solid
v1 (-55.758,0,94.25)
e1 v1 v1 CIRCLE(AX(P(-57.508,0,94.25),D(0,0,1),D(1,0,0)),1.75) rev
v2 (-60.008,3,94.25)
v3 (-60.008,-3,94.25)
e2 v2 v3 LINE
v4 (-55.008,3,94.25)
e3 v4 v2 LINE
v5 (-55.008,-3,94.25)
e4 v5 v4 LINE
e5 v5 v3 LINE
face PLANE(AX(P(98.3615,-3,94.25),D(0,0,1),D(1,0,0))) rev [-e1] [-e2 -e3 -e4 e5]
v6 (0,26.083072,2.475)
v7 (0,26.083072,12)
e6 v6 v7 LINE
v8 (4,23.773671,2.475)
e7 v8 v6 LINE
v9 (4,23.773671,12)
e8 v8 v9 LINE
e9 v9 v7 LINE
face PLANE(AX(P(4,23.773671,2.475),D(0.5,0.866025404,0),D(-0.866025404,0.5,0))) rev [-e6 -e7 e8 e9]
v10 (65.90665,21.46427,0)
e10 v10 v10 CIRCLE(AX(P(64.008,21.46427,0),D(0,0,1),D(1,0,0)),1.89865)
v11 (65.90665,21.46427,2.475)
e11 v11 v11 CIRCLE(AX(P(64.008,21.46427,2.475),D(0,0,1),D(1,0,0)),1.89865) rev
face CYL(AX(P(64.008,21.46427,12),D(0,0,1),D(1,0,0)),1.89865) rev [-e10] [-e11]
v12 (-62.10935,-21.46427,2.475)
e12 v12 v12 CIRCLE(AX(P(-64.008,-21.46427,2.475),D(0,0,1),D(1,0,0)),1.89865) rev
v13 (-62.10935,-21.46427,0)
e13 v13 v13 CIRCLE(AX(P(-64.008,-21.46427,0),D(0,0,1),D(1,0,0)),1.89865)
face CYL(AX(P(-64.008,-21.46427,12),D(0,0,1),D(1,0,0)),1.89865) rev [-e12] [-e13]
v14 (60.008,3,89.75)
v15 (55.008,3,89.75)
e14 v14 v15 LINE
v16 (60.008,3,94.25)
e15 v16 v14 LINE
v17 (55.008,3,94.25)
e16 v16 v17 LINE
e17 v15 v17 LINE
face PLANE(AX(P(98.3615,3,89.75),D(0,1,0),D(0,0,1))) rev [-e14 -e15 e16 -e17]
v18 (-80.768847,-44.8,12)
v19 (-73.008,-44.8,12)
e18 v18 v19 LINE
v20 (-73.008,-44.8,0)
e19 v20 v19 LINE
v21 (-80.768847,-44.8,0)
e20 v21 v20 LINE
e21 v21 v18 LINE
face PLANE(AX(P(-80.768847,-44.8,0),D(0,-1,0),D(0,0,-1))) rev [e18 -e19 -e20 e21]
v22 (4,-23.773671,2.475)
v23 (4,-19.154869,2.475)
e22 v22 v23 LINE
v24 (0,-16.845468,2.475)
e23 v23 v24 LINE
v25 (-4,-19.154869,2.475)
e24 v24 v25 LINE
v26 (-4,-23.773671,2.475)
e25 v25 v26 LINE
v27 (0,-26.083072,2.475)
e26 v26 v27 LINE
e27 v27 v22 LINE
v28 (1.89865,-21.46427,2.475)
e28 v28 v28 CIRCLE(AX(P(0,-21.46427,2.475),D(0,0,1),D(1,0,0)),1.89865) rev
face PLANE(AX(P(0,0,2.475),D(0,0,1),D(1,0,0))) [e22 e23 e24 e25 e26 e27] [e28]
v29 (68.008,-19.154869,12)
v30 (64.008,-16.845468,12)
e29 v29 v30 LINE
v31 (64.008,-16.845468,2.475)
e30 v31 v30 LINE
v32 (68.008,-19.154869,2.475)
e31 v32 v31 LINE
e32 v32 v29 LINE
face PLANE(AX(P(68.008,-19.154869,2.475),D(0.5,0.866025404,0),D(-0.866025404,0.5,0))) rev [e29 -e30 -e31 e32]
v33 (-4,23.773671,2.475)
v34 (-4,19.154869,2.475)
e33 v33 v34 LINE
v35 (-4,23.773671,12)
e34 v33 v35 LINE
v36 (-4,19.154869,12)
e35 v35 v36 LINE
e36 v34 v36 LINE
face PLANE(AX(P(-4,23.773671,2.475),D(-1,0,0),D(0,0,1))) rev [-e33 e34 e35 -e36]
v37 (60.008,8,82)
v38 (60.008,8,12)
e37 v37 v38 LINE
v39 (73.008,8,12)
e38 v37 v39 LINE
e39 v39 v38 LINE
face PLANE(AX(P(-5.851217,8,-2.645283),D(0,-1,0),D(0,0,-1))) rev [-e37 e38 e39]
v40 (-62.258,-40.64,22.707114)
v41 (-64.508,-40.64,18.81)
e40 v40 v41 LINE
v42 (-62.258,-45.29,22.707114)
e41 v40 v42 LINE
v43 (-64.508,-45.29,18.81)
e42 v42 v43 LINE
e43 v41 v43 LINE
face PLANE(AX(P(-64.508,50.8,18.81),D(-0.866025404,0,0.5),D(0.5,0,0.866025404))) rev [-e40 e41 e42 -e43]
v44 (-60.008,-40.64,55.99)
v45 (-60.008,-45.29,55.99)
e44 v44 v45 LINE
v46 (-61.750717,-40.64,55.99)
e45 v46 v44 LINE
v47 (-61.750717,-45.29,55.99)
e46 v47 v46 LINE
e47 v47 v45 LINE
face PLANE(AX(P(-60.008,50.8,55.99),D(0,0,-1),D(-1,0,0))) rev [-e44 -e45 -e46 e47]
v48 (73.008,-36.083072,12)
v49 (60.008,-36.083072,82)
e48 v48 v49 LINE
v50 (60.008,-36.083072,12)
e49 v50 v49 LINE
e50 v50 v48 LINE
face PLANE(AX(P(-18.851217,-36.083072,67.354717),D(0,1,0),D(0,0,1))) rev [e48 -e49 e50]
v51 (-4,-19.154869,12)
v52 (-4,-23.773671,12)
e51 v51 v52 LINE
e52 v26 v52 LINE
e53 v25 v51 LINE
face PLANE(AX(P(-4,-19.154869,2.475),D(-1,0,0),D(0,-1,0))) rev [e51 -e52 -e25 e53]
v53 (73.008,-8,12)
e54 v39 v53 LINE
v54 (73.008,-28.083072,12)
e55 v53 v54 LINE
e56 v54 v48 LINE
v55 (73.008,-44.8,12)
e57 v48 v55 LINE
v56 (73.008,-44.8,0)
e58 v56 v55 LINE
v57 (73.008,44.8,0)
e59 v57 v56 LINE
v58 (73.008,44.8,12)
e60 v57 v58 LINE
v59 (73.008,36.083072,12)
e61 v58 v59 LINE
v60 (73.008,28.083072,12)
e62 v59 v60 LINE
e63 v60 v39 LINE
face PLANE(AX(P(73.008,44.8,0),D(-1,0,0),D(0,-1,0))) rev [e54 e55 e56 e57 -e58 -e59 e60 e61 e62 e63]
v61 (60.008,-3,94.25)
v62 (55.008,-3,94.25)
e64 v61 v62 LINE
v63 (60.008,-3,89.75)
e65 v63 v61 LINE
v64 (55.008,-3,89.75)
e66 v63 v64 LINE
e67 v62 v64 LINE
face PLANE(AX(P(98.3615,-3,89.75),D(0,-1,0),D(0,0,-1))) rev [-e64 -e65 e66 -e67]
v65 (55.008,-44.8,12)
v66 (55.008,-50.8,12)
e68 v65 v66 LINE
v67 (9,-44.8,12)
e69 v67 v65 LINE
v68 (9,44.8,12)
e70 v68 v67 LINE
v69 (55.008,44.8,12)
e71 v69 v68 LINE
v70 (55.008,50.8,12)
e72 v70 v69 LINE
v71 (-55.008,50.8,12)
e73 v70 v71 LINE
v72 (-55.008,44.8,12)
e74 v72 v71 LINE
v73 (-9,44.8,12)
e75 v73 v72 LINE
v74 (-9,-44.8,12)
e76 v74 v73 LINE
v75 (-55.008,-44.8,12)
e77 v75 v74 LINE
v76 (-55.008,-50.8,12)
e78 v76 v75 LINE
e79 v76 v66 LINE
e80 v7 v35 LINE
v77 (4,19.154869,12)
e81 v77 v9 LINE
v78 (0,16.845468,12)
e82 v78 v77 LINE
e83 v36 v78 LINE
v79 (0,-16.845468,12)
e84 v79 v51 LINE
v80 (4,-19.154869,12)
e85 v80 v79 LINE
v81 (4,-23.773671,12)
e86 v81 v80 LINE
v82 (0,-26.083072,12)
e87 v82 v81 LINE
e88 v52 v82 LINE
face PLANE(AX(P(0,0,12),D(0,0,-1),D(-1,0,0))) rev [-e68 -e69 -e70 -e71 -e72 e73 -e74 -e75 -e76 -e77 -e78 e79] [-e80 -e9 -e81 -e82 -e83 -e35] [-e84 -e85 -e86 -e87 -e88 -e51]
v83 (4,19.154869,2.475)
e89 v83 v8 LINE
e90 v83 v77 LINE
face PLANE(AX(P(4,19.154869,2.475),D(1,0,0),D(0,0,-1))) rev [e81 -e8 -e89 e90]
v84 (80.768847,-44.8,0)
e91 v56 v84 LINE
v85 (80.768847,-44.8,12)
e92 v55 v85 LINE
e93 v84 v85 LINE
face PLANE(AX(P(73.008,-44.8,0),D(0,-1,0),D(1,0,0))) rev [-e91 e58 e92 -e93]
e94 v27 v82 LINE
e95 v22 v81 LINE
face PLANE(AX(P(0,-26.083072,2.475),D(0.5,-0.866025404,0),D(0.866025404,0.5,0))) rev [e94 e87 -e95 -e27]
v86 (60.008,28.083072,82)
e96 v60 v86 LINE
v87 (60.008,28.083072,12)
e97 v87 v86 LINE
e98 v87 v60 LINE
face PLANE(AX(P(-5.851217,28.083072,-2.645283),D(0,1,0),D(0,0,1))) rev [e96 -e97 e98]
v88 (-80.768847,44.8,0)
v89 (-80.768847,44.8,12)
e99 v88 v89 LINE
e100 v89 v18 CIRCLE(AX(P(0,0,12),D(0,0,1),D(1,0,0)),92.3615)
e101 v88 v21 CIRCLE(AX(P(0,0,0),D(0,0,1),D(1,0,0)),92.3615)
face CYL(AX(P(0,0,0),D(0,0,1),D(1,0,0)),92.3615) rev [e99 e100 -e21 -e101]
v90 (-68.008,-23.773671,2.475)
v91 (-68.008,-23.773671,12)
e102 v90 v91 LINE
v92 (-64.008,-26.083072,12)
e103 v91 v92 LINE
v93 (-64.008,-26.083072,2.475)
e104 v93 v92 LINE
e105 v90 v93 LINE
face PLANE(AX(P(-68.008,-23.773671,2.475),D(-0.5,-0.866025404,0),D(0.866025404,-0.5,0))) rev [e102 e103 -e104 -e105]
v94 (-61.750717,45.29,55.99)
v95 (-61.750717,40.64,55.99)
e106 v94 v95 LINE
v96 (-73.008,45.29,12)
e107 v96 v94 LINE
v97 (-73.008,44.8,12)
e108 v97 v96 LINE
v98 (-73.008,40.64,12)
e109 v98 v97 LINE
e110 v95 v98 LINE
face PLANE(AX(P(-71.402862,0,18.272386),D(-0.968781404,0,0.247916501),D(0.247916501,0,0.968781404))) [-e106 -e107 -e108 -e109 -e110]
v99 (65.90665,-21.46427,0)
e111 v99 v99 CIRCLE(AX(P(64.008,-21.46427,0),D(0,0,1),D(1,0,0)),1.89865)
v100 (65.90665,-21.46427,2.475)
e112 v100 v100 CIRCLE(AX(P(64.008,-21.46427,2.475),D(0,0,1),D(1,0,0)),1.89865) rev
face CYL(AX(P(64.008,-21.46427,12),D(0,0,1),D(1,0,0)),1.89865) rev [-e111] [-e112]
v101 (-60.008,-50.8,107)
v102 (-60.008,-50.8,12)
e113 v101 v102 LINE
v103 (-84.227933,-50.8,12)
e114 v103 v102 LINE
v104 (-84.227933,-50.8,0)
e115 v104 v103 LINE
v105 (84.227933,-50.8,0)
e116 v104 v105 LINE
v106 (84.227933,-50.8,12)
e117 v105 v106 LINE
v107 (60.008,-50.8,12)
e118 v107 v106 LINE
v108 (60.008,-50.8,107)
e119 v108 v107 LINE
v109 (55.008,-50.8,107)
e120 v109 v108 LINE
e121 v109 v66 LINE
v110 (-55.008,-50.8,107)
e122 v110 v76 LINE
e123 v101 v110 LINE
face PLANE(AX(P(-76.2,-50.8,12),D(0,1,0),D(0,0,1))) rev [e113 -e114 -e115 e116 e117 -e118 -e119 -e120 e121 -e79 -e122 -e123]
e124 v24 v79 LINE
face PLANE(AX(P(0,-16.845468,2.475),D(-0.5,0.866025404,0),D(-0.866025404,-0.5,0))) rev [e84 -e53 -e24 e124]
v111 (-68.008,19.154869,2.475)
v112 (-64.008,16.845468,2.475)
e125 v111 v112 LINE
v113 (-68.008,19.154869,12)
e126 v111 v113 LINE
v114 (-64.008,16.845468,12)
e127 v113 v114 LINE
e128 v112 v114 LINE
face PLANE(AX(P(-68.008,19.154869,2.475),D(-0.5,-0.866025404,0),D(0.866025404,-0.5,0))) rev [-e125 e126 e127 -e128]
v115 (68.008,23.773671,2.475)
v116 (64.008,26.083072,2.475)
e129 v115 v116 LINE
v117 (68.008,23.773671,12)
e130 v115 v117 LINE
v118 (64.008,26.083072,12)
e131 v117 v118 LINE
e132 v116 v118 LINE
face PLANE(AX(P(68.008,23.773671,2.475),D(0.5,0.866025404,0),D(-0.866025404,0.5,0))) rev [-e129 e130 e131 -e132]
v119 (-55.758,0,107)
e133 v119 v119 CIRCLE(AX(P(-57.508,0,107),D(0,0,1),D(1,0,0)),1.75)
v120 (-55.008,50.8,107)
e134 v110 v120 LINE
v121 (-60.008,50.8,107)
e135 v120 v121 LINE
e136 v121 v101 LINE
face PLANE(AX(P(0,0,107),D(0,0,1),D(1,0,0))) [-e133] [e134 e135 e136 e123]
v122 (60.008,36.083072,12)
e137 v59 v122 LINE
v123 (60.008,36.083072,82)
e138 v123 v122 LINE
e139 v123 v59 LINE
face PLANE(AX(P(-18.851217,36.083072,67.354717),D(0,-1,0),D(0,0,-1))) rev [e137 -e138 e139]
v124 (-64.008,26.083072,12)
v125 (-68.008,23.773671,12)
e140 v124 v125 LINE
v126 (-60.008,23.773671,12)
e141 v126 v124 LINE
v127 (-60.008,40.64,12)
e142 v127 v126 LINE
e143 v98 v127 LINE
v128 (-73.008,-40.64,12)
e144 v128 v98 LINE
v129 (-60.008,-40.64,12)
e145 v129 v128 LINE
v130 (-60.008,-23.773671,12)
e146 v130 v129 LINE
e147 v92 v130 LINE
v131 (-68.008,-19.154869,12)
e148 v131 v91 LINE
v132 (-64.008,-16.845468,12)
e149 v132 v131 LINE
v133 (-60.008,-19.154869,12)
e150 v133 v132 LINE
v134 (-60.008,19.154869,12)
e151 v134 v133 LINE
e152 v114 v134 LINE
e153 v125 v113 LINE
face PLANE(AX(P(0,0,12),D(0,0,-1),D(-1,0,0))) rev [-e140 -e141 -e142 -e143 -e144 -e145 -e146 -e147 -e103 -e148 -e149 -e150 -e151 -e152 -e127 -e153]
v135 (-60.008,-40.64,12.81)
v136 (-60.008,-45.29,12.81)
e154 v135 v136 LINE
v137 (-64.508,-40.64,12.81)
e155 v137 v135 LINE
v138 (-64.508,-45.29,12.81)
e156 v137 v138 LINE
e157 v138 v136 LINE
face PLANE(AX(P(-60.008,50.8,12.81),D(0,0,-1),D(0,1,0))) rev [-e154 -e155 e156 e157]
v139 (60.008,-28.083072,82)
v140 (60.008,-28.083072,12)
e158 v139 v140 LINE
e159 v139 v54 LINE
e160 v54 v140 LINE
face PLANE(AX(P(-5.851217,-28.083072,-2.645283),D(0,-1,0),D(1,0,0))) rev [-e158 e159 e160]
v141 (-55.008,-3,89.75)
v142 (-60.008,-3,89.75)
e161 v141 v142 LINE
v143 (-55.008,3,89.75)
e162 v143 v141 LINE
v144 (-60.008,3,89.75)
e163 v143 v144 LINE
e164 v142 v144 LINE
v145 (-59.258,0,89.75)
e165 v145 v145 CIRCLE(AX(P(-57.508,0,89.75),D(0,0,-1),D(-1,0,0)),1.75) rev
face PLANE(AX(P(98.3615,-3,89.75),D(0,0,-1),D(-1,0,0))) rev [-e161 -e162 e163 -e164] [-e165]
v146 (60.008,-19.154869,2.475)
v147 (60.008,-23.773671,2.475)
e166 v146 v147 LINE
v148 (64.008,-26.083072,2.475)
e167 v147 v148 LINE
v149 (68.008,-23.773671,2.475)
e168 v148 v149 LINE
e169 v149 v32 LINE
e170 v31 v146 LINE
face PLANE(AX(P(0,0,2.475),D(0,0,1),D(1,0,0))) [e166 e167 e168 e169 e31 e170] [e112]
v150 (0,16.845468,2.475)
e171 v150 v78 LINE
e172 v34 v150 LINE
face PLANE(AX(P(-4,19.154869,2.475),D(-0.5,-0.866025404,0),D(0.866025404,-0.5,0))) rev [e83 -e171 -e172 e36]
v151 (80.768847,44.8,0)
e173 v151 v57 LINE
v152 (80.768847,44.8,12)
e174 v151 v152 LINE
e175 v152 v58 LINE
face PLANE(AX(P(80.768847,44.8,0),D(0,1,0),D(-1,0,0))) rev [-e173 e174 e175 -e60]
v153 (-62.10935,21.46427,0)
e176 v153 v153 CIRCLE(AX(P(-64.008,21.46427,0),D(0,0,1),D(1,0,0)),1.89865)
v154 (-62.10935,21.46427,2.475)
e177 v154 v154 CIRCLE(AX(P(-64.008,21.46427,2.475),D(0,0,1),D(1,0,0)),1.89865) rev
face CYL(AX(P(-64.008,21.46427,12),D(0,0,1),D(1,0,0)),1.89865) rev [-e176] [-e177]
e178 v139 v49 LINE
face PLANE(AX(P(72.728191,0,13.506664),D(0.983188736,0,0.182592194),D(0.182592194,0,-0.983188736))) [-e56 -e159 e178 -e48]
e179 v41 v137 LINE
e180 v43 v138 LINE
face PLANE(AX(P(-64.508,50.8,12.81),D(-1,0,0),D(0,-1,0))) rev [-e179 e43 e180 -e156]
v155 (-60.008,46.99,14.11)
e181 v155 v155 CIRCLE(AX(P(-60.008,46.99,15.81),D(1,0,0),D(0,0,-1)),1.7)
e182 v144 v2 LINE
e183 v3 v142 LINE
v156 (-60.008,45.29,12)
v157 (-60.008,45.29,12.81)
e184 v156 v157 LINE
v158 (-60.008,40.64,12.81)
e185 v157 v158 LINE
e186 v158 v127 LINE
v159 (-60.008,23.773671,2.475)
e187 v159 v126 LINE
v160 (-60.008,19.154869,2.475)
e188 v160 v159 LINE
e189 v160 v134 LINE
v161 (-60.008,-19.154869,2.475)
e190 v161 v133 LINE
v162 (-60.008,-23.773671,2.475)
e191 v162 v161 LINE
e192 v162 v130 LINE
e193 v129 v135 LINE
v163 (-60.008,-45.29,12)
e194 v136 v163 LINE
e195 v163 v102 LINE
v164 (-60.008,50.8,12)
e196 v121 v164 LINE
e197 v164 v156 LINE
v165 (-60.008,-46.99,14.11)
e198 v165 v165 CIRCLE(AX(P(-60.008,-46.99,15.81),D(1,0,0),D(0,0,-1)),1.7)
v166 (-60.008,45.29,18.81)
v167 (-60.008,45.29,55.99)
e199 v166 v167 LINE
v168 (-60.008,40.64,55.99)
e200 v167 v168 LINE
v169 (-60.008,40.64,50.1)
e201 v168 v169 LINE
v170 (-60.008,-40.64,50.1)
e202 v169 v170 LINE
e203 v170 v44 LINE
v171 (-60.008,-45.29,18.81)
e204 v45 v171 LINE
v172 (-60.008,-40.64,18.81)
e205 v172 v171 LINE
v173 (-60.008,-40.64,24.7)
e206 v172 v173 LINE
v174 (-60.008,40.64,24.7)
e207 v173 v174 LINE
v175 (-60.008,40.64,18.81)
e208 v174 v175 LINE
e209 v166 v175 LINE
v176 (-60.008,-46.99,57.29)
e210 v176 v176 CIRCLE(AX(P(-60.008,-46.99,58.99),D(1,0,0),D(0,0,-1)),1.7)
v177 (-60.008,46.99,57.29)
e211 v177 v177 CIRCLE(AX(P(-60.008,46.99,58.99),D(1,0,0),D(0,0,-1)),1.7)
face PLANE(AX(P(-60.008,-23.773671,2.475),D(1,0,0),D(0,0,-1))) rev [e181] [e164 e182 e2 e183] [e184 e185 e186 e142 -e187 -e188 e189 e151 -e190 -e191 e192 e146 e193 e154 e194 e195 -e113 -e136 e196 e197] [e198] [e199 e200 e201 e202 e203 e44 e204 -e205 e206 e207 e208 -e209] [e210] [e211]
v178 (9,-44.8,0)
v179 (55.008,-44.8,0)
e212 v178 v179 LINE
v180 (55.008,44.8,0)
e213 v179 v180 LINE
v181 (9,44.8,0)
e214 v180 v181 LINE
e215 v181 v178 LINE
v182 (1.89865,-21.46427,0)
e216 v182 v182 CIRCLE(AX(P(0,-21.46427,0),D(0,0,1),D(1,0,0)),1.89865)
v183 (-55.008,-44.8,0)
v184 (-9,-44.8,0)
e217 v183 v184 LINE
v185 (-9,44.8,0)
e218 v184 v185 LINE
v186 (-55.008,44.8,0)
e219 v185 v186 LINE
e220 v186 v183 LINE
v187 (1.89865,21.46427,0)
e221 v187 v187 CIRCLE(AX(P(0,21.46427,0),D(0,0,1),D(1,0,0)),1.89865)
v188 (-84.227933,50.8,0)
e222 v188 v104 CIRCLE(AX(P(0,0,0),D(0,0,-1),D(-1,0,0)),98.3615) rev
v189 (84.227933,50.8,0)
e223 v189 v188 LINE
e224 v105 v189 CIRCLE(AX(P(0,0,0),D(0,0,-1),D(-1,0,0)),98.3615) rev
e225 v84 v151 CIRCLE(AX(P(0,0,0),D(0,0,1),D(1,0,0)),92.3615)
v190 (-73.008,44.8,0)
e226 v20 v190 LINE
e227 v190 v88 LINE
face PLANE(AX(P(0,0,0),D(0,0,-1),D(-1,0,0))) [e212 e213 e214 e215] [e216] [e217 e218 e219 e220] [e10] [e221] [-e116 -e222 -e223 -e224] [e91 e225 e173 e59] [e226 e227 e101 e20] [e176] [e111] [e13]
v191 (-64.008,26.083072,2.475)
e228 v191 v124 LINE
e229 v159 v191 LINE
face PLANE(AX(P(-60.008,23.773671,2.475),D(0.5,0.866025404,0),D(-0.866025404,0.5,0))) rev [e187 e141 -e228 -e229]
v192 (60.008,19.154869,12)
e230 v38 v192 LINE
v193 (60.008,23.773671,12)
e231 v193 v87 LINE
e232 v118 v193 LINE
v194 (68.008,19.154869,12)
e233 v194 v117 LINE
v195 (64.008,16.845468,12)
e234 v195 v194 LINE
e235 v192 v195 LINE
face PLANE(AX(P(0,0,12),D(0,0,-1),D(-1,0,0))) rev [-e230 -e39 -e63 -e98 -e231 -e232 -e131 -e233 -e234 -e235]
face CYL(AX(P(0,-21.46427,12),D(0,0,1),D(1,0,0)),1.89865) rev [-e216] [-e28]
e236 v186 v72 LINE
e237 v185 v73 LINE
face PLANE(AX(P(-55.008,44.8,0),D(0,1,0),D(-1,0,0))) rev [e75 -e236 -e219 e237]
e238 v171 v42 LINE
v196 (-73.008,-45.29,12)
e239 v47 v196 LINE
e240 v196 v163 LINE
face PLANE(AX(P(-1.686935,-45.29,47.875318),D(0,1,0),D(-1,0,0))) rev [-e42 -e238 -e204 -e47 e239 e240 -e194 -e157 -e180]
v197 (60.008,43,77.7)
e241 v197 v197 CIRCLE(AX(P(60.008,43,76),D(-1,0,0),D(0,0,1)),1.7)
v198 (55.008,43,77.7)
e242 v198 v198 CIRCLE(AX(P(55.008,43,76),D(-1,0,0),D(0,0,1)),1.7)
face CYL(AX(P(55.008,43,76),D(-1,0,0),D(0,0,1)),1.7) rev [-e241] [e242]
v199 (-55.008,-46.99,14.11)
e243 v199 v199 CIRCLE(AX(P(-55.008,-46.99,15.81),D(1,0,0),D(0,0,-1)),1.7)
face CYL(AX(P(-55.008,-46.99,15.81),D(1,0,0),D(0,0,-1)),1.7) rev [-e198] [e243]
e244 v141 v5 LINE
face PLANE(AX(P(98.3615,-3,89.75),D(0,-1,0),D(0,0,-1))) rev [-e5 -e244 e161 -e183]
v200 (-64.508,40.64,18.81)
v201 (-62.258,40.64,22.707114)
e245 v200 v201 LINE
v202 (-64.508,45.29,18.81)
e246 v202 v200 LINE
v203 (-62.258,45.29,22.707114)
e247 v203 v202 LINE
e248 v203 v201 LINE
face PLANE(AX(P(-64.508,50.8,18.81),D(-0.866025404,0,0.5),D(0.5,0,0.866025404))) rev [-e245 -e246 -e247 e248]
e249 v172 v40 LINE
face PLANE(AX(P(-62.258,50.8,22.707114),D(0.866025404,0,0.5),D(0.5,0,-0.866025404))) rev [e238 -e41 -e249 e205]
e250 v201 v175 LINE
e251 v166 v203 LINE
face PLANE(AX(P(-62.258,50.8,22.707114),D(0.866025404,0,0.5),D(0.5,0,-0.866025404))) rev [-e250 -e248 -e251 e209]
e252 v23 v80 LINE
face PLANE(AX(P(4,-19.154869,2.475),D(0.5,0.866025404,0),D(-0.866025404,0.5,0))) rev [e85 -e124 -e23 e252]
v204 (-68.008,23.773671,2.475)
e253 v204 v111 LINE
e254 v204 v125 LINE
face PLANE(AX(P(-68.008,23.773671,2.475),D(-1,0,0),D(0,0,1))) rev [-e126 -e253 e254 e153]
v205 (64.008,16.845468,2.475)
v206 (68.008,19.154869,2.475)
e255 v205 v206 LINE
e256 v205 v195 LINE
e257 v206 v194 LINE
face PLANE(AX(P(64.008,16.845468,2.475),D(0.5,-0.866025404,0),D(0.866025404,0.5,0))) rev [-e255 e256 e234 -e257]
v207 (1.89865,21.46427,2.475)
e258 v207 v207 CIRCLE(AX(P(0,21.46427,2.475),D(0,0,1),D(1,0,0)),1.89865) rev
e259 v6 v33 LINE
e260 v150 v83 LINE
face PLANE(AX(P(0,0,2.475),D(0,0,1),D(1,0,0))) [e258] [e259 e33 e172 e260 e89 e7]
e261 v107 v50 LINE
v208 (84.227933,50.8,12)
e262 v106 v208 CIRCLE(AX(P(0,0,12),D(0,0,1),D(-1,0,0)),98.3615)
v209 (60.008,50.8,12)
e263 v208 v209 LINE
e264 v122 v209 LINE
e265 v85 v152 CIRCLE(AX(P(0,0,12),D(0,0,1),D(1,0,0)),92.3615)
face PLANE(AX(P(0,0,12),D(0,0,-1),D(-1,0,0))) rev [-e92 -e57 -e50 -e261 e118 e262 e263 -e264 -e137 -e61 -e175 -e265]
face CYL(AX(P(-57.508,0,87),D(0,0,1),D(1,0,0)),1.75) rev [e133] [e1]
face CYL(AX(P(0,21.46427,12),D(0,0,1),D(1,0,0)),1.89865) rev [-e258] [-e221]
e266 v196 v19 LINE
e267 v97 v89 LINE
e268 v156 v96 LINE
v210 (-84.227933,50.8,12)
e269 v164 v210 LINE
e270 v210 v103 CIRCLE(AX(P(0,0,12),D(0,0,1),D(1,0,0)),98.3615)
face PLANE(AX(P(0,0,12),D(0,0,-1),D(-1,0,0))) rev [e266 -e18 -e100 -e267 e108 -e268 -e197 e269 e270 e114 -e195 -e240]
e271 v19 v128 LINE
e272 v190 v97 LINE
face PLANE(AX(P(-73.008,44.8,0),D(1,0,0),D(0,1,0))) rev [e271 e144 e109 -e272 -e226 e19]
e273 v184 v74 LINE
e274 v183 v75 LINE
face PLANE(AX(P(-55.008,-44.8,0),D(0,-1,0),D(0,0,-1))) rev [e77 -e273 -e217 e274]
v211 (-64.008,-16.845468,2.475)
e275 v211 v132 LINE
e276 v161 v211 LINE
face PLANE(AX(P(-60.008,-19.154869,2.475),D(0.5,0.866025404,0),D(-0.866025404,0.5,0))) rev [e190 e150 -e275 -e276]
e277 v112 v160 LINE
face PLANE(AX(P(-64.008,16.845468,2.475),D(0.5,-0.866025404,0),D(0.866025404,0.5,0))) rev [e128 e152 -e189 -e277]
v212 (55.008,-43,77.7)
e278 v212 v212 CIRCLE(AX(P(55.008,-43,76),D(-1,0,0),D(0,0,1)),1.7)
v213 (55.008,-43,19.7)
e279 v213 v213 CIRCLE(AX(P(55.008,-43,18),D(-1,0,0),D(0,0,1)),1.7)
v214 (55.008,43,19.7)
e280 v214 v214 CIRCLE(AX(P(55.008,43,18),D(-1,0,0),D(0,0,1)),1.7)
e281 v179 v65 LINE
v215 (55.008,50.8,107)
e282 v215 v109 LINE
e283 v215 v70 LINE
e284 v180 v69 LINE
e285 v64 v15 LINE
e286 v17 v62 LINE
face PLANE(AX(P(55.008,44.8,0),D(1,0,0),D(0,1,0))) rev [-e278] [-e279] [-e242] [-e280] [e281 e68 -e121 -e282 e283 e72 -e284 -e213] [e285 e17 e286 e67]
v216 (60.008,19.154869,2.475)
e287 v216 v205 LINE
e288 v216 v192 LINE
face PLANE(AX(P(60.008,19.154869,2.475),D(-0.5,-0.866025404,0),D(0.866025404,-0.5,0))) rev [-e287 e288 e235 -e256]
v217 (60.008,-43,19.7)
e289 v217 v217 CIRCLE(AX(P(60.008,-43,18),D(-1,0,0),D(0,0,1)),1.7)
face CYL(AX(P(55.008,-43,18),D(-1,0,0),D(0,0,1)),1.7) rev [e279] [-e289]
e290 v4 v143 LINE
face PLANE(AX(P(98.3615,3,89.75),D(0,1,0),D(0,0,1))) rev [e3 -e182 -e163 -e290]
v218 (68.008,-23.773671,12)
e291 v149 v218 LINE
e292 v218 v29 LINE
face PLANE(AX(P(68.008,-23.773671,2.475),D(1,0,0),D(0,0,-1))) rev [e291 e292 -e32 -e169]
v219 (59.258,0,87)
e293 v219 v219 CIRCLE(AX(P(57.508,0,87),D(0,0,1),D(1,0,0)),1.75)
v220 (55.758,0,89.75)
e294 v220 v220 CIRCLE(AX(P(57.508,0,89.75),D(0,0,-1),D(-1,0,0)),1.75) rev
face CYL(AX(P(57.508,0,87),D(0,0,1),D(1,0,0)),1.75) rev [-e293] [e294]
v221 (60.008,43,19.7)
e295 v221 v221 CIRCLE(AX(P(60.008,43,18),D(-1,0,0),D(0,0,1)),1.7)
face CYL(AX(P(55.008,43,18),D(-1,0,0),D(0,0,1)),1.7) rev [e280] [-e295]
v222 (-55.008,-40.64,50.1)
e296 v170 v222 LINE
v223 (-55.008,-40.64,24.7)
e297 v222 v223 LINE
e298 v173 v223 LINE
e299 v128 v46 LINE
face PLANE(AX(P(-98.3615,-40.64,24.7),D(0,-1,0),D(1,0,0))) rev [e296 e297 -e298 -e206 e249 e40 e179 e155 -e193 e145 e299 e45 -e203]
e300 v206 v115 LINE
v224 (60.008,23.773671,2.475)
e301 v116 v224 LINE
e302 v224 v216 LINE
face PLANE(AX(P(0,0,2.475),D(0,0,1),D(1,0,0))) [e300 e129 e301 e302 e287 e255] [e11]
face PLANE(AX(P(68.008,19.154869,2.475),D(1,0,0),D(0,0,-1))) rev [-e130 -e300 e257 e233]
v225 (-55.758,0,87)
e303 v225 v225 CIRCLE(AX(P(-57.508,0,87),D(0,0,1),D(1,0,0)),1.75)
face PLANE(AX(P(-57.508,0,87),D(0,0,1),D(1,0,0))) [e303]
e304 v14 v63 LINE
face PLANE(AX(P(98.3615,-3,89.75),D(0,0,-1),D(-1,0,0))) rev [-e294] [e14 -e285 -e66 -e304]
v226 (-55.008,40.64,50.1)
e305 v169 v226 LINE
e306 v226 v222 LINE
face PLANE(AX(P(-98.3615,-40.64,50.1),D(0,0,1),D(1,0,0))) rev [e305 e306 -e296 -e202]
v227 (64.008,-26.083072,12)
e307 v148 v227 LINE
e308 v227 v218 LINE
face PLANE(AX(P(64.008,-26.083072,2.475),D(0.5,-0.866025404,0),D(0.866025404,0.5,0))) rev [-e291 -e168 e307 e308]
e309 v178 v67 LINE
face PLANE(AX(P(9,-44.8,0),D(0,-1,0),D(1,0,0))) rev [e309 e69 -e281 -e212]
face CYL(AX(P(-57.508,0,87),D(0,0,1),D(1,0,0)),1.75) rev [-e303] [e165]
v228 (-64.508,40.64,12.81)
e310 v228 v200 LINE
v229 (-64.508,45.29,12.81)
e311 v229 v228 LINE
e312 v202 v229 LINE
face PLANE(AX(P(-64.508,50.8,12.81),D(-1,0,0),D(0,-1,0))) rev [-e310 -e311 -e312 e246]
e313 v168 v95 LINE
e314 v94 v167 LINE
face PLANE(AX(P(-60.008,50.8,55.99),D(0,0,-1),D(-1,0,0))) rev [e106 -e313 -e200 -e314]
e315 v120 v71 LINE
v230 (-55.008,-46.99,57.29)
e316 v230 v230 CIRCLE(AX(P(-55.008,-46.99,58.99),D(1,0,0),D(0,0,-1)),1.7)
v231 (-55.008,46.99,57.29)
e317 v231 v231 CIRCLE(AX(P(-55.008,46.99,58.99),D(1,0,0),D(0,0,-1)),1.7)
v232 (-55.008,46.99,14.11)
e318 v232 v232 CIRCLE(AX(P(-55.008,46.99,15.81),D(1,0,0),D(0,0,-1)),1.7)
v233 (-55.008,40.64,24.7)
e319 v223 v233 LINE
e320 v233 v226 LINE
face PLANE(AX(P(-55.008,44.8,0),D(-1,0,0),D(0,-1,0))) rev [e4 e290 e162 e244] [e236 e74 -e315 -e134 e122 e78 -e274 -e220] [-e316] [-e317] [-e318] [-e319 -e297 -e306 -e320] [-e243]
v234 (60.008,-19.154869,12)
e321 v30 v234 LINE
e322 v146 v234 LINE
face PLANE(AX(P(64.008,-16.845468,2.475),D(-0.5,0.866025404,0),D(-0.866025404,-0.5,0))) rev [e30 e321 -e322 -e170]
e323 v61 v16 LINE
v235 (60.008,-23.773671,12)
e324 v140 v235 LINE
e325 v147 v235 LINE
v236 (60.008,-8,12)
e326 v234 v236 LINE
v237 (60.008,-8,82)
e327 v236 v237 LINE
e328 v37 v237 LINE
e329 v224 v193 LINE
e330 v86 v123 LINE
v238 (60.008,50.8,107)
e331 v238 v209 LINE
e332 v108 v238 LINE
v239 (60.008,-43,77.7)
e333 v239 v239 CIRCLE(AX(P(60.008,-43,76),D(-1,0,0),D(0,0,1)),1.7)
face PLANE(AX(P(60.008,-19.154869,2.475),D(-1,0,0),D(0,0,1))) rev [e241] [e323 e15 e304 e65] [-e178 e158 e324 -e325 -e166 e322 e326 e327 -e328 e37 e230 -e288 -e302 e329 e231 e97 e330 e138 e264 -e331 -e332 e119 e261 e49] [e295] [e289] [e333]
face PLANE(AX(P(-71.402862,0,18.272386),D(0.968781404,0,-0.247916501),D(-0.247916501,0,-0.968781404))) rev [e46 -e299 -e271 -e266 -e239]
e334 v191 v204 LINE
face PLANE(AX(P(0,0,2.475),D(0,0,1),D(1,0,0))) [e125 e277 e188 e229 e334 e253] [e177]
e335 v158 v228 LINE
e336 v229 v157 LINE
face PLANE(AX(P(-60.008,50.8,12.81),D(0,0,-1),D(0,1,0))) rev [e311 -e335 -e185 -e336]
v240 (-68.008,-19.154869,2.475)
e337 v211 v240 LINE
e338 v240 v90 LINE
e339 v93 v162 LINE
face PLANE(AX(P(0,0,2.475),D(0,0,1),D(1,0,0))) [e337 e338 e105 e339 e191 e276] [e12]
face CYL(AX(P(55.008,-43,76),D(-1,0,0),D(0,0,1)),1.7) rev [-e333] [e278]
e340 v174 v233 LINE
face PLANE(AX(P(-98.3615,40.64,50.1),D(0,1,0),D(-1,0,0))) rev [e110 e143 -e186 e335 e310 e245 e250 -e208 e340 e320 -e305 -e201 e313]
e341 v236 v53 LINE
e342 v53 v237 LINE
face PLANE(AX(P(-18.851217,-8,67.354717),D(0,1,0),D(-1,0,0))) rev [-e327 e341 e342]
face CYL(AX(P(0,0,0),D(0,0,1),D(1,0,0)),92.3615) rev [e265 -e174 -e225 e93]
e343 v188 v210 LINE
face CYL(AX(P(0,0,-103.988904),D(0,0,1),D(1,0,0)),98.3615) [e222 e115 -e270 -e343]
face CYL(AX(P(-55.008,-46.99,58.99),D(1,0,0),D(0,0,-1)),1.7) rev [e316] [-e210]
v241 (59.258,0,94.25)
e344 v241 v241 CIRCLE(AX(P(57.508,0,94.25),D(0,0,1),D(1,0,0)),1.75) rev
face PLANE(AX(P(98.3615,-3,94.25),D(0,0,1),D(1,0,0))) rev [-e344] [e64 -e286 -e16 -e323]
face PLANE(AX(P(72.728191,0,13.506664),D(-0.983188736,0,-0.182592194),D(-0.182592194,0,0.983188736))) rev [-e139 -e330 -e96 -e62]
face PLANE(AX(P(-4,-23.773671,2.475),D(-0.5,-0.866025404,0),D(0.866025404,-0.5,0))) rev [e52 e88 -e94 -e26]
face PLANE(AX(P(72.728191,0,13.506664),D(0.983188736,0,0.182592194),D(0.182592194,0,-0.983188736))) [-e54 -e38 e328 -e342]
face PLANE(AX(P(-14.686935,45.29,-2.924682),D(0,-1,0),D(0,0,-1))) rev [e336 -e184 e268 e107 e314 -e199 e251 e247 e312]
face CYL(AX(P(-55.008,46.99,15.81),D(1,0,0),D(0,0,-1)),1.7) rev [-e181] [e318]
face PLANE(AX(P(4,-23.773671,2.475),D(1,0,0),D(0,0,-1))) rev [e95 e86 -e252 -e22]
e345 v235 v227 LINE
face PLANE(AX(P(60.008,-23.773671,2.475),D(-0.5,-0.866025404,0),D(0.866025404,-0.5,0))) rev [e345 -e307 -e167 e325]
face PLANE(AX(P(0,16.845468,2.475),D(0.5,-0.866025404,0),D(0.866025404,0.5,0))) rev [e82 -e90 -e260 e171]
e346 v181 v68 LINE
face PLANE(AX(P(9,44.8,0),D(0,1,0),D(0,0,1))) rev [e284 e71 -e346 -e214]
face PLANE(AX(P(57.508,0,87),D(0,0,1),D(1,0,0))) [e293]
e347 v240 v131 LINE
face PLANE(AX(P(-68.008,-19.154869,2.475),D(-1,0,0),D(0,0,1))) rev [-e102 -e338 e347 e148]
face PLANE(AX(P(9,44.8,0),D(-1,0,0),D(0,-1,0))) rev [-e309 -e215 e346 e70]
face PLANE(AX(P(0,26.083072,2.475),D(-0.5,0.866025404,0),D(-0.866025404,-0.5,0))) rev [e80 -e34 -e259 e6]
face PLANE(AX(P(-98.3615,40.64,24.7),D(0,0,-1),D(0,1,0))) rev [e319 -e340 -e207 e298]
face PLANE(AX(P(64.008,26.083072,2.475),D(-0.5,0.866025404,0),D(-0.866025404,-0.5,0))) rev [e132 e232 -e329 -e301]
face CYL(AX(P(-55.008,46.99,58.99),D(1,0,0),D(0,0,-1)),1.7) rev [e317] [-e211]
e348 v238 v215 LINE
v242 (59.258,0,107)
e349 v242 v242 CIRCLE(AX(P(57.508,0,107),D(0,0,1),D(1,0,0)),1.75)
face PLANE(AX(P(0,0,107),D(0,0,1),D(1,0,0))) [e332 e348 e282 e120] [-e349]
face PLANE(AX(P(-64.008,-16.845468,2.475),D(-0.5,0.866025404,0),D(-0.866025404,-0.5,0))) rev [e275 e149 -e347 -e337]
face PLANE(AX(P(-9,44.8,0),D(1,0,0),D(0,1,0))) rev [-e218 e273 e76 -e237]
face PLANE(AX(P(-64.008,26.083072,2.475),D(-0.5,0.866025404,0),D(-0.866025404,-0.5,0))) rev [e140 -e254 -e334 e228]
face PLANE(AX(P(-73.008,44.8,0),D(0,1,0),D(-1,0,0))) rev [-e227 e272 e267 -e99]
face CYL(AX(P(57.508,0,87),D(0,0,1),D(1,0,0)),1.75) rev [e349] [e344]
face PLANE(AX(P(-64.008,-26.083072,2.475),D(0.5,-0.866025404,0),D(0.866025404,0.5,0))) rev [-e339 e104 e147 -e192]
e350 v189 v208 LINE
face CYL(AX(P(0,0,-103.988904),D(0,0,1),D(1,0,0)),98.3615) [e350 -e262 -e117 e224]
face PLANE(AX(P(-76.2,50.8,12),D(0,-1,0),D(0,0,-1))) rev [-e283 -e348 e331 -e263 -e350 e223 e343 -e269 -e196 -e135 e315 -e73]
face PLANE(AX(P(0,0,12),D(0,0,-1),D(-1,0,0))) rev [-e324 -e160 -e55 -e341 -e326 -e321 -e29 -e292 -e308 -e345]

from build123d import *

# Parameters (mm, degrees)
SKETCH1_W                = 152.4
SKETCH1_H                = 101.6
BOSS_EXTRUDE1_DEPTH      = 12
F_6_CLEARANCE_HOLE1_D    = 3.7973
BOSS_EXTRUDE2_DEPTH      = 12
CUT_EXTRUDE2_DEPTH       = 9.525
SKETCH5_W                = 46.008
SKETCH5_H                = 89.6
CUT_EXTRUDE1_DEPTH       = 112.353602017
SKETCH7_W                = 5
SKETCH7_H                = 101.6
BOSS_EXTRUDE3_DEPTH      = 50.8
M3_CLEARANCE_HOLE1_D     = 3.4
SKETCH9_W                = 25.4
SKETCH9_H                = 81.28
CUT_EXTRUDE3_DEPTH       = 174.339792114
BOSS_EXTRUDE4_START      = -45.29
BOSS_EXTRUDE4_DEPTH      = 4.65
BOSS_EXTRUDE4_START_2    = 40.64
BOSS_EXTRUDE4_2_DEPTH    = 4.65
CUT_EXTRUDE4_DEPTH       = 152.169152879
SKETCH12_W               = 5
SKETCH12_H               = 101.6
BOSS_EXTRUDE5_DEPTH      = 70
M3_CLEARANCE_HOLE2_D     = 3.4
M3_CLEARANCE_HOLE2_DEPTH = 43.3535
BOSS_EXTRUDE6_REACH      = 193.164
SKETCH14_W               = 71.196910045
SKETCH14_H               = 16
SKETCH14_H_2             = 8
BOSS_EXTRUDE7_DEPTH      = 25
BOSS_EXTRUDE8_REACH      = 155.963
SKETCH16_W               = 5
SKETCH16_H               = 101.6
SKETCH17_R               = 1.75
CUT_EXTRUDE5_DEPTH       = 20
CUT_EXTRUDE6_DEPTH       = 198.763845357
CUT_EXTRUDE6_DEPTH_BACK  = 198.763845357
SKETCH19_W               = 4.5
SKETCH19_H               = 6


# Read off the part's stored shape, not the designer's step: Boss-Extrude4
with BuildPart() as part:
    # Sketch1 → Boss-Extrude1 (new body)
    with BuildSketch(Plane.XY):
        Rectangle(SKETCH1_W, SKETCH1_H)
    extrude(amount=BOSS_EXTRUDE1_DEPTH)

    # #6 Clearance Hole1 (through all)
    with Locations(Plane(origin=(-64.008, 21.46427, 12), x_dir=(1, 0, 0), z_dir=(0, 0, 1))):
        with Locations((0, 0), (128.016, 0), (128.016, -42.92854), (0, -42.92854), (64.008, 0), (64.008, -42.92854)):
            Hole(F_6_CLEARANCE_HOLE1_D / 2)

    # Sketch4 → Boss-Extrude2 (add)
    with BuildSketch(Plane.XY.offset(12)):
        with BuildLine():
            Line((-76.2, 50.8), (-84.22793291, 50.8))
            ThreePointArc((-84.22793291, 50.8), (-98.3615, 0), (-84.22793291, -50.8))
            Line((-84.22793291, -50.8), (-76.2, -50.8))
            Line((-76.2, -50.8), (-76.2, 50.8))
        make_face()
        with BuildLine():
            Line((76.2, -50.8), (84.22793291, -50.8))
            ThreePointArc((84.22793291, -50.8), (98.3615, 0), (84.22793291, 50.8))
            Line((84.22793291, 50.8), (76.2, 50.8))
            Line((76.2, 50.8), (76.2, -50.8))
        make_face()
    extrude(amount=-BOSS_EXTRUDE2_DEPTH)

    # Sketch6 → Cut-Extrude2 (cut)
    with BuildSketch(Plane.XY.offset(12)):
        Polygon((-68.008, 19.154868923), (-64.008, 16.845467846), (-60.008, 19.154868923), (-60.008, 23.773671077), (-64.008, 26.083072154), (-68.008, 23.773671077), align=None)
        Polygon((4, 19.154868923), (4, 23.773671077), (0, 26.083072154), (-4, 23.773671077), (-4, 19.154868923), (0, 16.845467846), align=None)
        Polygon((68.008, 19.154868923), (68.008, 23.773671077), (64.008, 26.083072154), (60.008, 23.773671077), (60.008, 19.154868923), (64.008, 16.845467846), align=None)
        Polygon((68.008, -23.773671077), (68.008, -19.154868923), (64.008, -16.845467846), (60.008, -19.154868923), (60.008, -23.773671077), (64.008, -26.083072154), align=None)
        Polygon((4, -23.773671077), (4, -19.154868923), (0, -16.845467846), (-4, -19.154868923), (-4, -23.773671077), (0, -26.083072154), align=None)
        Polygon((-60.008, -23.773671077), (-60.008, -19.154868923), (-64.008, -16.845467846), (-68.008, -19.154868923), (-68.008, -23.773671077), (-64.008, -26.083072154), align=None)
    extrude(amount=-CUT_EXTRUDE2_DEPTH, mode=Mode.SUBTRACT)

    # Sketch5 → Cut-Extrude1 (cut, through all)
    with BuildSketch(Plane.XY.offset(12)):
        with BuildLine():
            Line((-73.008, 44.8), (-73.008, -44.8))
            Line((-73.008, -44.8), (-80.768847226, -44.8))
            ThreePointArc((-80.768847226, -44.8), (-92.3615, 0), (-80.768847226, 44.8))
            Line((-80.768847226, 44.8), (-73.008, 44.8))
        make_face()
        with BuildLine():
            Line((73.008, 44.8), (73.008, -44.8))
            Line((73.008, -44.8), (80.768847226, -44.8))
            ThreePointArc((80.768847226, -44.8), (92.3615, 0), (80.768847226, 44.8))
            Line((80.768847226, 44.8), (73.008, 44.8))
        make_face()
        with Locations((-32.004, 0)):
            Rectangle(SKETCH5_W, SKETCH5_H)
        with Locations((32.004, 0)):
            Rectangle(SKETCH5_W, SKETCH5_H)
    extrude(amount=-CUT_EXTRUDE1_DEPTH, mode=Mode.SUBTRACT)

    # Sketch7 → Boss-Extrude3 (add)
    with BuildSketch(Plane.XY.offset(12)):
        with Locations((-57.508, 0)):
            Rectangle(SKETCH7_W, SKETCH7_H)
    extrude(amount=BOSS_EXTRUDE3_DEPTH)

    # M3 Clearance Hole1 (through all)
    with Locations(Plane(origin=(-55.008, 46.99, 58.99), x_dir=(0, 1, 0), z_dir=(1, 0, 0))):
        with Locations((0, 0), (0, -43.18), (-93.98, -43.18), (-93.98, 0)):
            Hole(M3_CLEARANCE_HOLE1_D / 2)

    # Sketch9 → Cut-Extrude3 (cut, through all)
    with BuildSketch(Plane(origin=(-55.008, 0, 0), x_dir=(0, 0, -1), z_dir=(1, 0, 0))):
        with Locations((-37.4, 0)):
            Rectangle(SKETCH9_W, SKETCH9_H)
    extrude(amount=-CUT_EXTRUDE3_DEPTH, mode=Mode.SUBTRACT)

    # Boss-Extrude4 outline → Boss-Extrude4 (add)
    with BuildSketch(Plane(origin=(0, 0, 0), x_dir=(1, 0, 0), z_dir=(0, 1, 0)).offset(BOSS_EXTRUDE4_START)):
        Polygon((-60.008, -12), (-73.008, -12), (-60.008, -62.8), align=None)
    extrude(amount=BOSS_EXTRUDE4_DEPTH)

    # Boss-Extrude4 2 outline → Boss-Extrude4 2 (add)
    with BuildSketch(Plane(origin=(0, 0, 0), x_dir=(1, 0, 0), z_dir=(0, 1, 0)).offset(BOSS_EXTRUDE4_START_2)):
        Polygon((-60.008, -12), (-73.008, -12), (-60.008, -62.8), align=None)
    extrude(amount=BOSS_EXTRUDE4_2_DEPTH)

    # Sketch11 → Cut-Extrude4 (cut, through all)
    with BuildSketch(Plane(origin=(0, -45.29, 0), x_dir=(-1, 0, 0), z_dir=(0, -1, 0))):
        Polygon((64.508, -18.81), (62.258, -22.707114317), (60.008, -18.81), (60.008, -12.81), (64.508, -12.81), align=None)
        Polygon((60.008, -55.99), (64.508, -55.99), (64.508, -61.99), (64.508, -62.8), (60.008, -62.8), (60.008, -61.99), align=None)
    extrude(amount=-CUT_EXTRUDE4_DEPTH, mode=Mode.SUBTRACT)

    # Sketch12 → Boss-Extrude5 (add)
    with BuildSketch(Plane.XY.offset(12)):
        with Locations((57.508, 0)):
            Rectangle(SKETCH12_W, SKETCH12_H)
    extrude(amount=BOSS_EXTRUDE5_DEPTH)

    # M3 Clearance Hole2
    with Locations(Plane(origin=(55.008, -43, 76), x_dir=(0, -1, 0), z_dir=(-1, 0, 0))):
        with Locations((0, 0), (0, -58), (-86, -58), (-86, 0)):
            Hole(M3_CLEARANCE_HOLE2_D / 2, depth=M3_CLEARANCE_HOLE2_DEPTH)

    # Boss-Extrude6: up to this face of the body (flat: up to its plane)
    boss_extrude6_end = Plane(part.part.faces().sort_by_distance((60.008, 0, 46.511614943))[0])
    # Sketch14 → Boss-Extrude6 (add, up to the picked face)
    with BuildSketch(Plane(origin=(72.728190965, 0, 13.506664036), x_dir=(-0.18259219384277645, 0, 0.983188736076488), z_dir=(-0.9831887360764879, 0, -0.18259219384277642)), mode=Mode.PRIVATE) as boss_extrude6_sk1:
        with Locations((34.066028968, 0)):
            Rectangle(SKETCH14_W, SKETCH14_H)
    boss_extrude6_tool1 = split(extrude(boss_extrude6_sk1.sketch, amount=BOSS_EXTRUDE6_REACH, mode=Mode.PRIVATE), bisect_by=boss_extrude6_end, keep=Keep.BOTH, mode=Mode.PRIVATE)
    # Sketch14 → Boss-Extrude6 (add, up to the picked face)
    with BuildSketch(Plane(origin=(72.728190965, 0, 13.506664036), x_dir=(-0.18259219384277645, 0, 0.983188736076488), z_dir=(-0.9831887360764879, 0, -0.18259219384277642)), mode=Mode.PRIVATE) as boss_extrude6_sk2:
        with Locations((34.066028968, -32.083072154)):
            Rectangle(SKETCH14_W, SKETCH14_H_2)
    boss_extrude6_tool2 = split(extrude(boss_extrude6_sk2.sketch, amount=BOSS_EXTRUDE6_REACH, mode=Mode.PRIVATE), bisect_by=boss_extrude6_end, keep=Keep.BOTH, mode=Mode.PRIVATE)
    # Sketch14 → Boss-Extrude6 (add, up to the picked face)
    with BuildSketch(Plane(origin=(72.728190965, 0, 13.506664036), x_dir=(-0.18259219384277645, 0, 0.983188736076488), z_dir=(-0.9831887360764879, 0, -0.18259219384277642)), mode=Mode.PRIVATE) as boss_extrude6_sk3:
        with Locations((34.066028968, 32.083072154)):
            Rectangle(SKETCH14_W, SKETCH14_H_2)
    boss_extrude6_tool3 = split(extrude(boss_extrude6_sk3.sketch, amount=BOSS_EXTRUDE6_REACH, mode=Mode.PRIVATE), bisect_by=boss_extrude6_end, keep=Keep.BOTH, mode=Mode.PRIVATE)
    add(boss_extrude6_tool1.solids().sort_by(Axis((66.508, 0, 47), (-0.9831887360764879, 0, -0.18259219384277642)))[0])
    add(boss_extrude6_tool2.solids().sort_by(Axis((66.508, -32.083072, 47), (-0.9831887360764879, 0, -0.18259219384277642)))[0])
    add(boss_extrude6_tool3.solids().sort_by(Axis((66.508, 32.083072, 47), (-0.9831887360764879, 0, -0.18259219384277642)))[0])

    # Sketch15 → Boss-Extrude7 (add)
    with BuildSketch(Plane.XY.offset(82)):
        Polygon((60.008, 50.8), (55.008, 50.8), (55.008, -50.8), (60.008, -50.8), (60.008, -36.083072154), (60.008, -28.083072154), (60.008, -8), (60.008, 8), (60.008, 28.083072154), (60.008, 36.083072154), align=None)
    extrude(amount=BOSS_EXTRUDE7_DEPTH)

    # Sketch16 → Boss-Extrude8 (add, up to next)
    with BuildSketch(Plane.XY.offset(107), mode=Mode.PRIVATE) as boss_extrude8_sk1:
        with Locations((-57.508, 0)):
            Rectangle(SKETCH16_W, SKETCH16_H)
    boss_extrude8_tool1 = extrude(boss_extrude8_sk1.sketch, amount=-BOSS_EXTRUDE8_REACH, mode=Mode.PRIVATE) - part.part
    add(boss_extrude8_tool1.solids().sort_by_distance((-57.508, 0, 107))[0])

    # Sketch17 → Cut-Extrude5 (cut)
    with BuildSketch(Plane.XY.offset(107)):
        with Locations((-57.508, 0)):
            Circle(SKETCH17_R)
        with Locations((57.508, 0)):
            Circle(SKETCH17_R)
    extrude(amount=-CUT_EXTRUDE5_DEPTH, mode=Mode.SUBTRACT)

    # Sketch19 → Cut-Extrude6 (cut, two sides: drawn at the far end of the back side and taken through both)
    with BuildSketch(Plane.ZY.offset(60.008).offset(-CUT_EXTRUDE6_DEPTH_BACK)):
        with Locations((92, 0)):
            Rectangle(SKETCH19_W, SKETCH19_H)
    extrude(amount=CUT_EXTRUDE6_DEPTH + CUT_EXTRUDE6_DEPTH_BACK, mode=Mode.SUBTRACT)


solid = part.part
